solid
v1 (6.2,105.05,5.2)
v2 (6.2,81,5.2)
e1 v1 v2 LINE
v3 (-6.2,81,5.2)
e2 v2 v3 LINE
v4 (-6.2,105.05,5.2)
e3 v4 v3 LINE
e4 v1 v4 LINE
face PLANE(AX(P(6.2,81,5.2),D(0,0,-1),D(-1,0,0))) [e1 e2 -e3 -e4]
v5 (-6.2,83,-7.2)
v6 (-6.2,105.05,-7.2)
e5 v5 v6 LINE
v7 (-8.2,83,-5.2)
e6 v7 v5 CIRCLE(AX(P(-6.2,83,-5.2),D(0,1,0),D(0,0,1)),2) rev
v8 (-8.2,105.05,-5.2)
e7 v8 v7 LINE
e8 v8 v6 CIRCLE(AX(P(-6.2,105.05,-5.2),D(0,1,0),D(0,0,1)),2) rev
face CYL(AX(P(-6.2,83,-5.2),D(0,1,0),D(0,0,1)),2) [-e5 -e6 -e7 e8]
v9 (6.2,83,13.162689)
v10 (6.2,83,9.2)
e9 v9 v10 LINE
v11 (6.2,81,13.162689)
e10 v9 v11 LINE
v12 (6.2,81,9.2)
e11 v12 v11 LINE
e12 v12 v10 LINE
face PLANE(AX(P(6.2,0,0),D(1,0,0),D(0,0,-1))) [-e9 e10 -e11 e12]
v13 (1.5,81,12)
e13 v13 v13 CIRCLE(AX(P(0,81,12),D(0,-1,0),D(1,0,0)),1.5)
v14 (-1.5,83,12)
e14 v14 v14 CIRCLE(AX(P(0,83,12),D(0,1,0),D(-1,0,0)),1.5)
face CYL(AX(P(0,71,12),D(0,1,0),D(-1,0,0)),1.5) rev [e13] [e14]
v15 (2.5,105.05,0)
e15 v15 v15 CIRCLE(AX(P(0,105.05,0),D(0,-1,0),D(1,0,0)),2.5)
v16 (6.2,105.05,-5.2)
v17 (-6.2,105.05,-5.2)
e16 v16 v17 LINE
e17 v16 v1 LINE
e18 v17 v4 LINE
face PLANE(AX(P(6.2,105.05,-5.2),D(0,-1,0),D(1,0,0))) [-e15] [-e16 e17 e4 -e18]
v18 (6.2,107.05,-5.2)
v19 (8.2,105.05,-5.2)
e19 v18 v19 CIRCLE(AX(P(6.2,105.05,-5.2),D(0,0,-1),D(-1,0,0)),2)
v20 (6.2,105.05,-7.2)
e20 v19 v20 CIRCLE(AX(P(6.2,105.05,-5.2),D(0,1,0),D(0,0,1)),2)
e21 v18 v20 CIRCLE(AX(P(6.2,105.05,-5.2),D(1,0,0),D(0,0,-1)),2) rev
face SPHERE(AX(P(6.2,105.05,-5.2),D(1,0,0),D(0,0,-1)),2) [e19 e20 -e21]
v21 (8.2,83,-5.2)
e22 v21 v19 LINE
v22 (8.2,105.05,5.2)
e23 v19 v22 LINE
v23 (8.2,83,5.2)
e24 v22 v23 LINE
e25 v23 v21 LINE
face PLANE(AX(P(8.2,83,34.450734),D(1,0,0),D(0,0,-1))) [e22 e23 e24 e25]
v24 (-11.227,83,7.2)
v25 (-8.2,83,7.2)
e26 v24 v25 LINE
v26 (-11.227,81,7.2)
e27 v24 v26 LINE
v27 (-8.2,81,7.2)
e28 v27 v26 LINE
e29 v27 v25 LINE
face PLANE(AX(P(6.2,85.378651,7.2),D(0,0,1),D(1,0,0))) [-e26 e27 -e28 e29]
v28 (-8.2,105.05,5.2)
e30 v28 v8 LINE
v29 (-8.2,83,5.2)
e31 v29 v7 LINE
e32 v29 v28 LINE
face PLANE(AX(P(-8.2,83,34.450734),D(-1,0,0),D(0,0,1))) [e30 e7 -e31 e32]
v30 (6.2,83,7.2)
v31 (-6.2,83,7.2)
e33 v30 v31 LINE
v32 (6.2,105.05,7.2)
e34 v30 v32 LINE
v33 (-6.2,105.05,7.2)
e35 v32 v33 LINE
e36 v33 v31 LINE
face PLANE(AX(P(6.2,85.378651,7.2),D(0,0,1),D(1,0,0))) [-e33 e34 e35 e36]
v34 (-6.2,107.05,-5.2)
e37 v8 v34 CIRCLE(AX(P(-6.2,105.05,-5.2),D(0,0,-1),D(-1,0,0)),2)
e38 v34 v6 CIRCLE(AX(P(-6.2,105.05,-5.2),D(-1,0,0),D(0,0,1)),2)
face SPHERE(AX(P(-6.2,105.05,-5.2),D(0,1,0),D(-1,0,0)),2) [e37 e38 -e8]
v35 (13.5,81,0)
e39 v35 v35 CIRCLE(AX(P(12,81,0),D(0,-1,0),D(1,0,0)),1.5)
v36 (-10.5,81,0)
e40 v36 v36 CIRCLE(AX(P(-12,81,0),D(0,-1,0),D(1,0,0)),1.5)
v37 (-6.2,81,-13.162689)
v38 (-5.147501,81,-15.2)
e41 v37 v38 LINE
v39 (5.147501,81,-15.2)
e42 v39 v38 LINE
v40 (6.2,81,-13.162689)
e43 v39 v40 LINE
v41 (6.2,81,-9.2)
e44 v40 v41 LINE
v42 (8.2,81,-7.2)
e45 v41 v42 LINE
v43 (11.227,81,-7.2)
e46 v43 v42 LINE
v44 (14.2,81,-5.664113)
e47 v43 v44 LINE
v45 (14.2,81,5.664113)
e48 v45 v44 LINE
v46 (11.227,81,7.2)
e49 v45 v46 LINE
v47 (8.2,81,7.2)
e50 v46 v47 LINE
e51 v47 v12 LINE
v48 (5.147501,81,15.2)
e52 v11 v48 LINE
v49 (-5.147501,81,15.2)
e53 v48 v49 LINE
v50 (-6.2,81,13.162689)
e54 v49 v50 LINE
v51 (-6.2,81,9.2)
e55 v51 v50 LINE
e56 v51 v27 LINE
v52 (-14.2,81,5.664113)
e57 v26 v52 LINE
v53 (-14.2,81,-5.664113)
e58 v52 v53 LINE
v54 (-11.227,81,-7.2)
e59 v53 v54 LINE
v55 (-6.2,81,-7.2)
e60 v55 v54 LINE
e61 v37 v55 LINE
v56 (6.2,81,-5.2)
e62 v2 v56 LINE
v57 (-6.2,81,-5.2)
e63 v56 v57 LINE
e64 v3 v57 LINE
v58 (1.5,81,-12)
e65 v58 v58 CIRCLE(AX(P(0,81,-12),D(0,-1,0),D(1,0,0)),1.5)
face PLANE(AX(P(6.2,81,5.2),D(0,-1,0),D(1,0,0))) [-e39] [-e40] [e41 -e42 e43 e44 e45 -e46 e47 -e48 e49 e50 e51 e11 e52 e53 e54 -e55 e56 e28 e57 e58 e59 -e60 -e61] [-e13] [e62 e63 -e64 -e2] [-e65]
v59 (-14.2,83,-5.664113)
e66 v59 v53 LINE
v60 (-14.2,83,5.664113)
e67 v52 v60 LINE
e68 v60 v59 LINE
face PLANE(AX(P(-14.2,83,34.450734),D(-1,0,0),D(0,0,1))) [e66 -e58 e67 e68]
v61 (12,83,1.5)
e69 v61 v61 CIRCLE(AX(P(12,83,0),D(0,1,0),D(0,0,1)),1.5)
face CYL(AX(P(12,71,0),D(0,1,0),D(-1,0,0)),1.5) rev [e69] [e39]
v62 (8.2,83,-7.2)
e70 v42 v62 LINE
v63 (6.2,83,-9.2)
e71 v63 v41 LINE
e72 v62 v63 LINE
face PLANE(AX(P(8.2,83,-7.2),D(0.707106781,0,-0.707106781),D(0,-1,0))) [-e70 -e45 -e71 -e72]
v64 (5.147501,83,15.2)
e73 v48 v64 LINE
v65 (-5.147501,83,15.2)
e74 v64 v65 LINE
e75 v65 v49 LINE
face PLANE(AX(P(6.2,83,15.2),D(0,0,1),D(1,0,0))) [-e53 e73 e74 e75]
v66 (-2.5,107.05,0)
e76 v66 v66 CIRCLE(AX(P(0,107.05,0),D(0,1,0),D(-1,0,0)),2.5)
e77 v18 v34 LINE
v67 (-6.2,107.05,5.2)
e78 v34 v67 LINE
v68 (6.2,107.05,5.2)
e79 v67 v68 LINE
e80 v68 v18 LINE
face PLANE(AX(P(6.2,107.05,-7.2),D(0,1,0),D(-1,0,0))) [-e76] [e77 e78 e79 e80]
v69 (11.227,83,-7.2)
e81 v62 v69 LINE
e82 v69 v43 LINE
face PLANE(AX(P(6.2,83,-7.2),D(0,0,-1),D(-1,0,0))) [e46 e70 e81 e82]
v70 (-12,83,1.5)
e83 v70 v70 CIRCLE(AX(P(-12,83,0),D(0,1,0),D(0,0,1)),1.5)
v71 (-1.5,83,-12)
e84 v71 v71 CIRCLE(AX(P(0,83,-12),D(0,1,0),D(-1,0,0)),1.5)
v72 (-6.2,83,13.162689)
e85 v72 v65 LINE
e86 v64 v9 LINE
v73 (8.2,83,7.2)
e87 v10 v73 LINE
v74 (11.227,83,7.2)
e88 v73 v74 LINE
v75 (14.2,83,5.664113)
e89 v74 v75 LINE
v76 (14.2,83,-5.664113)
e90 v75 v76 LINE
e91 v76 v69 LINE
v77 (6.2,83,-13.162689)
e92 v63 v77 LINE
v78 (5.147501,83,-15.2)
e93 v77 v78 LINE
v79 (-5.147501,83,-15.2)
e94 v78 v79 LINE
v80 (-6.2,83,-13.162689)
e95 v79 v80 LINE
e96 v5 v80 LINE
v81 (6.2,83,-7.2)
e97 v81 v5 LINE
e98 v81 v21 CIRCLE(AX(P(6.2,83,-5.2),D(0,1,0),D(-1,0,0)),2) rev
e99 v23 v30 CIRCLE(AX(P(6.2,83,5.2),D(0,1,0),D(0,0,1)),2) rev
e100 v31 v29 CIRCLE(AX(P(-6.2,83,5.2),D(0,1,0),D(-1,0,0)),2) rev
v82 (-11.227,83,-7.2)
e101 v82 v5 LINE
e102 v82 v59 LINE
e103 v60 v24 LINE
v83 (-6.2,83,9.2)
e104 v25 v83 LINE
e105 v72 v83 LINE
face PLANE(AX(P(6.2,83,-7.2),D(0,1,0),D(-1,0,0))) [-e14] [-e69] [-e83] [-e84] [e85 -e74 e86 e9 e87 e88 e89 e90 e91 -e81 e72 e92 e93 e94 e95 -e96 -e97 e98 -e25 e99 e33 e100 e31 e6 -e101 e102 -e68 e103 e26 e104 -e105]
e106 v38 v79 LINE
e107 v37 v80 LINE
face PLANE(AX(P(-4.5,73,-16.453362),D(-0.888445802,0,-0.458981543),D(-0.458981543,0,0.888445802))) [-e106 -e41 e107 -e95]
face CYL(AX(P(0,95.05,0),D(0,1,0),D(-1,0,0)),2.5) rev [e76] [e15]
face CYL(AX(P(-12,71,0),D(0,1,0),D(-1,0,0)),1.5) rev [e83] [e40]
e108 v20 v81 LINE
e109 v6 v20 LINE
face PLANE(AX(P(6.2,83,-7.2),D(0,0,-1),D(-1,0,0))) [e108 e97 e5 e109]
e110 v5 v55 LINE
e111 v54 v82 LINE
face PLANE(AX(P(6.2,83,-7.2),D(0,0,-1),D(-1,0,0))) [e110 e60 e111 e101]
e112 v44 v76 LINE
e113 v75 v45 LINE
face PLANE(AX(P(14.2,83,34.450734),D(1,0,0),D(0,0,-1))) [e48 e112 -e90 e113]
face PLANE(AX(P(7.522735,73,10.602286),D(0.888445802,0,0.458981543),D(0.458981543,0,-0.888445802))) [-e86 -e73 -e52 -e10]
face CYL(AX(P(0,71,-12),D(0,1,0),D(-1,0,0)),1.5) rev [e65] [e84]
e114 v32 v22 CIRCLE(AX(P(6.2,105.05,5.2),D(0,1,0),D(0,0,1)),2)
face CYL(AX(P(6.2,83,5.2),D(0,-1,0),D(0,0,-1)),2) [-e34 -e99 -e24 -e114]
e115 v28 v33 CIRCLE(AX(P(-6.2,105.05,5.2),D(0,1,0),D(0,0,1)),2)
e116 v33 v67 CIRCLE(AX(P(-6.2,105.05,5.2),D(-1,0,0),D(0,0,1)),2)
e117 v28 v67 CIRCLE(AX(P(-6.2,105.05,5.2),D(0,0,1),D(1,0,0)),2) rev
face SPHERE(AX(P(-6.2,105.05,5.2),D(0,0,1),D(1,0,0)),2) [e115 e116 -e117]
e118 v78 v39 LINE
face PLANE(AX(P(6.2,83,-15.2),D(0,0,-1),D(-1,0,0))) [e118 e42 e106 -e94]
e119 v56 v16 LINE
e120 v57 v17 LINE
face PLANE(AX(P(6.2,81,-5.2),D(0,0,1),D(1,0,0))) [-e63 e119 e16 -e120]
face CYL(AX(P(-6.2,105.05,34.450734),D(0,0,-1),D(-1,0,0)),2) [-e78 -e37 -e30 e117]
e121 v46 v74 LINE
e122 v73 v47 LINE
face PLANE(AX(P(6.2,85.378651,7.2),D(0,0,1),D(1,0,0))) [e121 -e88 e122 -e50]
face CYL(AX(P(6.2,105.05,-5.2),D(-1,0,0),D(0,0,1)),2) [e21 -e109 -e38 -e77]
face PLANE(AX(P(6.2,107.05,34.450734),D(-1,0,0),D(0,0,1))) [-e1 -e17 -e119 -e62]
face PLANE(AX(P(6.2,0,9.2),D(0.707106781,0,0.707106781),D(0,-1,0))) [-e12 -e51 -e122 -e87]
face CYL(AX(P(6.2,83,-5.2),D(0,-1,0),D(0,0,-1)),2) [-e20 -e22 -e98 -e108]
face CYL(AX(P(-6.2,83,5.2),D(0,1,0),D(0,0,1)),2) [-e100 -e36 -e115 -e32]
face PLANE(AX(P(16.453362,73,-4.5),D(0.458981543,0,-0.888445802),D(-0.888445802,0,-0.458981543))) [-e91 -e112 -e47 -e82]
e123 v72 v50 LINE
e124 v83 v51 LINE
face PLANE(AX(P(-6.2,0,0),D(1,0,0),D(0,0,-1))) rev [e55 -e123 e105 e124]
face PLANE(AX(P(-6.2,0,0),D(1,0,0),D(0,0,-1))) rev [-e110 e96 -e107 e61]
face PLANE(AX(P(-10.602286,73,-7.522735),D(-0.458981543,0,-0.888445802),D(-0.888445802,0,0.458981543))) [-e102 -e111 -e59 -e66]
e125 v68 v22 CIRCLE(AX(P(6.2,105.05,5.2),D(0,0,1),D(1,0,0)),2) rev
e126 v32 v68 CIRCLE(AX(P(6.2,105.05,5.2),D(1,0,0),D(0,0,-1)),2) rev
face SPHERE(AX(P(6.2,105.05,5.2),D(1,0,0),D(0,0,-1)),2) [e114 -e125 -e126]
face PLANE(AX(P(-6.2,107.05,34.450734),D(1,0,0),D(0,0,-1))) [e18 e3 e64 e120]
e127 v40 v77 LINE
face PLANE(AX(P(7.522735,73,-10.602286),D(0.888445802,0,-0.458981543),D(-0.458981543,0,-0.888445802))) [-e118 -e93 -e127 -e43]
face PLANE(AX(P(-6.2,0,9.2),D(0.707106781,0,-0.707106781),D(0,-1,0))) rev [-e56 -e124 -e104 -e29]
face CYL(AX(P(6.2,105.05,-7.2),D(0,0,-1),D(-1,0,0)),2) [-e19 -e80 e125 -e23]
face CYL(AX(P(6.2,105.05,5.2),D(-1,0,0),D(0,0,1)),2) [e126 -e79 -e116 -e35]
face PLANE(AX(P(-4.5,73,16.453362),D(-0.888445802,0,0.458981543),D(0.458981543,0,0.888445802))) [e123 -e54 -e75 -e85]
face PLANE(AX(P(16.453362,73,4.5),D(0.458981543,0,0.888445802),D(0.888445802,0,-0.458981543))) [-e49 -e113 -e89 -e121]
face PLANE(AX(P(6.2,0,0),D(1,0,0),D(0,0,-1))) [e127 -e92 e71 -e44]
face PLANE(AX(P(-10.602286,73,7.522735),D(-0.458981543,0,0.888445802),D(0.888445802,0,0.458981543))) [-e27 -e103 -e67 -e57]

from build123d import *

# Parameters (mm, degrees)
BOSS_EXTRUDE1_START = 0.2
BOSS_EXTRUDE1_DEPTH = 12.4
SKETCH4_R           = 2.5
CUT_EXTRUDE1_DEPTH  = 12
SKETCH5_R           = 1.5
CUT_EXTRUDE2_DEPTH  = 12
BOSS_EXTRUDE3_DEPTH = 14.4
CIRPATTERN1_COUNT   = 2
CIRPATTERN1_ANGLE   = 90
CUT_EXTRUDE3_DEPTH  = 10
CHAMFER1_SIZE       = 2
FILLET1_R           = 2


with BuildPart() as part:
    # Sketch3 → Boss-Extrude1 (new body)
    with BuildSketch(Plane.ZY.offset(6.000000089).offset(BOSS_EXTRUDE1_START)):
        Polygon((5.2, 81), (5.2, 105.05), (-5.2, 105.05), (-5.2, 81), (-15.2, 81), (-15.2, 83), (-7.2, 83), (-7.2, 107.05), (7.2, 107.05), (7.2, 85.378651171), (7.2, 83), (15.2, 83), (15.2, 81), align=None)
    extrude(amount=-BOSS_EXTRUDE1_DEPTH)

    # Sketch4 → Cut-Extrude1 (cut)
    with BuildSketch(Plane(origin=(0, 107.05, 0), x_dir=(1, 0, 0), z_dir=(0, 1, 0))):
        with Locations(Location((0, 0, 0), (0, 0, 180))):
            Circle(SKETCH4_R)
    extrude(amount=-CUT_EXTRUDE1_DEPTH, mode=Mode.SUBTRACT)

    # Sketch5 → Cut-Extrude2 (cut)
    with BuildSketch(Plane(origin=(0, 83, 0), x_dir=(1, 0, 0), z_dir=(0, 1, 0))):
        with Locations(Location((-1.03e-07, 12, 0), (0, 0, 180))):
            Circle(SKETCH5_R)
        with Locations(Location((-1.03e-07, -12, 0), (0, 0, 180))):
            Circle(SKETCH5_R)
    cut_extrude2 = extrude(amount=-CUT_EXTRUDE2_DEPTH, mode=Mode.SUBTRACT)

    # Sketch7 → Boss-Extrude3 (add)
    with BuildSketch(Plane(origin=(0, 0, -7.2), x_dir=(-1, 0, 0), z_dir=(0, 0, -1))):
        Polygon((14.200000089, 83), (14.200000089, 81), (6.200000089, 81), (6.200000089, 107.05), (8.200000089, 107.05), (8.200000089, 83), align=None)
        Polygon((-8.200000089, 107.05), (-6.200000089, 107.05), (-6.200000089, 81), (-14.200000089, 81), (-14.200000089, 83), (-8.200000089, 83), align=None)
    extrude(amount=-BOSS_EXTRUDE3_DEPTH)

    # CirPattern1: Cut-Extrude2 ×2 about axis
    cirpattern1_axis = Axis((0, 0, 0), (0, 1, 0))
    for i in range(1, CIRPATTERN1_COUNT):
        add(cut_extrude2.rotate(cirpattern1_axis, i * CIRPATTERN1_ANGLE / (CIRPATTERN1_COUNT - 1)), mode=Mode.SUBTRACT)

    # Sketch11 → Cut-Extrude3 (cut)
    with BuildSketch(Plane(origin=(0, 83, 0), x_dir=(1, 0, 0), z_dir=(0, 1, 0))):
        with BuildLine():
            Line((18.453361638, 5.717898617), (11.935828042, 9.084933074))
            ThreePointArc((11.935828042, 9.084933074), (10.606601718, 10.606601718), (9.084933074, 11.935828042))
            Line((9.084933074, 11.935828042), (5.717898617, 18.453361638))
            Line((5.717898617, 18.453361638), (-5.717898617, 18.453361638))
            Line((-5.717898617, 18.453361638), (-9.084933074, 11.935828042))
            ThreePointArc((-9.084933074, 11.935828042), (-10.606601718, 10.606601718), (-11.935828042, 9.084933074))
            Line((-11.935828042, 9.084933074), (-18.453361638, 5.717898617))
            Line((-18.453361638, 5.717898617), (-18.453361638, -5.717898617))
            Line((-18.453361638, -5.717898617), (-11.935828042, -9.084933074))
            ThreePointArc((-11.935828042, -9.084933074), (-10.606601718, -10.606601718), (-9.084933074, -11.935828042))
            Line((-9.084933074, -11.935828042), (-5.717898617, -18.453361638))
            Line((-5.717898617, -18.453361638), (5.717898617, -18.453361638))
            Line((5.717898617, -18.453361638), (9.084933074, -11.935828042))
            ThreePointArc((9.084933074, -11.935828042), (10.606601718, -10.606601718), (11.935828042, -9.084933074))
            Line((11.935828042, -9.084933074), (18.453361638, -5.717898617))
            Line((18.453361638, -5.717898617), (18.453361638, 5.717898617))
        make_face()
        with BuildLine():
            Line((16.453361638, 4.5), (10.602285857, 7.522734517))
            ThreePointArc((10.602285857, 7.522734517), (9.192388155, 9.192388155), (7.522734517, 10.602285857))
            Line((7.522734517, 10.602285857), (4.5, 16.453361638))
            Line((4.5, 16.453361638), (-4.5, 16.453361638))
            Line((-4.5, 16.453361638), (-7.522734517, 10.602285857))
            ThreePointArc((-7.522734517, 10.602285857), (-9.192388155, 9.192388155), (-10.602285857, 7.522734517))
            Line((-10.602285857, 7.522734517), (-16.453361638, 4.5))
            Line((-16.453361638, 4.5), (-16.453361638, -4.5))
            Line((-16.453361638, -4.5), (-10.602285857, -7.522734517))
            ThreePointArc((-10.602285857, -7.522734517), (-9.192388155, -9.192388155), (-7.522734517, -10.602285857))
            Line((-7.522734517, -10.602285857), (-4.5, -16.453361638))
            Line((-4.5, -16.453361638), (4.5, -16.453361638))
            Line((4.5, -16.453361638), (7.522734517, -10.602285857))
            ThreePointArc((7.522734517, -10.602285857), (9.192388155, -9.192388155), (10.602285857, -7.522734517))
            Line((10.602285857, -7.522734517), (16.453361638, -4.5))
            Line((16.453361638, -4.5), (16.453361638, 4.5))
        make_face(mode=Mode.SUBTRACT)
    extrude(amount=-CUT_EXTRUDE3_DEPTH, mode=Mode.SUBTRACT)

    # Chamfer1
    chamfer1_edges = [part.edges().sort_by_distance(p)[0] for p in [
        (-6.200000089, 82, 7.2),
        (6.200000089, 82, -7.2),
        (6.200000089, 82, 7.2),
    ]]
    chamfer(chamfer1_edges, length=CHAMFER1_SIZE)

    # Fillet1
    # the kernel refuses this fillet: 2 mm, written as the material it takes off along each edge
    with BuildSketch(Plane(origin=(-6.200000089, 105.05, -5.2), x_dir=(0, 1, 0), z_dir=(0, 0, -1))) as fillet1_piece_1_section:
        Polygon((0, 0), (FILLET1_R * 1.02, 0), (FILLET1_R * 1.02, -FILLET1_R * 1.02), (0, -FILLET1_R * 1.02), align=None)
    fillet1_piece_1 = extrude(amount=FILLET1_R * 1.02, mode=Mode.PRIVATE)
    fillet1_piece_1 = fillet1_piece_1 - Plane(origin=(-6.200000089, 105.05, -5.2), x_dir=(0.7071067811865474, -0.7071067811865478, 5.985977498731896e-15), z_dir=(0, 0, -1)) * Sphere(FILLET1_R, mode=Mode.PRIVATE)
    add(fillet1_piece_1, mode=Mode.SUBTRACT)
    with BuildSketch(Plane(origin=(6.200000089, 105.05, -5.2), x_dir=(0, 0, -1), z_dir=(1, 0, 0))) as fillet1_piece_2_section:
        Polygon((0, 0), (FILLET1_R * 1.02, 0), (FILLET1_R * 1.02, FILLET1_R * 1.02), (0, FILLET1_R * 1.02), align=None)
    fillet1_piece_2 = extrude(amount=FILLET1_R * 1.02, mode=Mode.PRIVATE)
    fillet1_piece_2 = fillet1_piece_2 - Plane(origin=(6.200000089, 105.05, -5.2), x_dir=(-6.4472925120618815e-15, -0.7071067811865475, 0.7071067811865475), z_dir=(1, 0, 0)) * Sphere(FILLET1_R, mode=Mode.PRIVATE)
    add(fillet1_piece_2, mode=Mode.SUBTRACT)
    with BuildSketch(Plane(origin=(6.200000089, 105.05, 5.2), x_dir=(0, 0, 1), z_dir=(1, 0, 0))) as fillet1_piece_3_section:
        Polygon((0, 0), (FILLET1_R * 1.02, 0), (FILLET1_R * 1.02, -FILLET1_R * 1.02), (0, -FILLET1_R * 1.02), align=None)
    fillet1_piece_3 = extrude(amount=FILLET1_R * 1.02, mode=Mode.PRIVATE)
    fillet1_piece_3 = fillet1_piece_3 - Plane(origin=(6.200000089, 105.05, 5.2), x_dir=(5.5246624854019046e-15, -0.7071067811865475, -0.7071067811865475), z_dir=(1, 0, 0)) * Sphere(FILLET1_R, mode=Mode.PRIVATE)
    add(fillet1_piece_3, mode=Mode.SUBTRACT)
    with BuildSketch(Plane(origin=(-6.200000089, 105.05, 5.2), x_dir=(0, 1, 0), z_dir=(0, 0, 1))) as fillet1_piece_4_section:
        Polygon((0, 0), (FILLET1_R * 1.02, 0), (FILLET1_R * 1.02, FILLET1_R * 1.02), (0, FILLET1_R * 1.02), align=None)
    fillet1_piece_4 = extrude(amount=FILLET1_R * 1.02, mode=Mode.PRIVATE)
    fillet1_piece_4 = fillet1_piece_4 - Plane(origin=(-6.200000089, 105.05, 5.2), x_dir=(0.7071067811865474, -0.7071067811865478, 5.985977498731896e-15), z_dir=(0, 0, 1)) * Sphere(FILLET1_R, mode=Mode.PRIVATE)
    add(fillet1_piece_4, mode=Mode.SUBTRACT)
    with BuildSketch(Plane(origin=(-6.200000089, 107.05, -7.2), x_dir=(0, 0, 1), z_dir=(1, 0, 0)), Plane(origin=(6.200000089, 107.05, 7.2), x_dir=(0, 0, -1), z_dir=(-1, 0, 0))) as fillet1_piece_5:
        with BuildLine():
            CenterArc((FILLET1_R, FILLET1_R), FILLET1_R, 180, 90)
            Line((0, FILLET1_R), (0, 0))
            Line((0, 0), (FILLET1_R, 0))
        make_face()
    extrude(amount=12.400000179, mode=Mode.SUBTRACT)
    with BuildSketch(Plane(origin=(-8.200000089, 105.05, -7.2), x_dir=(0, 0, 1), z_dir=(0, -1, 0)), Plane(origin=(8.200000089, 83, -7.2), x_dir=(0, 0, 1), z_dir=(0, 1, 0))) as fillet1_piece_6:
        with BuildLine():
            CenterArc((FILLET1_R, -FILLET1_R), FILLET1_R, 90, 90)
            Line((0, -FILLET1_R), (0, 0))
            Line((0, 0), (FILLET1_R, 0))
        make_face()
    extrude(amount=22.05, mode=Mode.SUBTRACT)
    with BuildSketch(Plane(origin=(-8.200000089, 105.05, 7.2), x_dir=(0, 0, -1), z_dir=(0, -1, 0)), Plane(origin=(8.200000089, 83, 7.2), x_dir=(0, 0, -1), z_dir=(0, 1, 0))) as fillet1_piece_7:
        with BuildLine():
            CenterArc((FILLET1_R, FILLET1_R), FILLET1_R, 180, 90)
            Line((0, FILLET1_R), (0, 0))
            Line((0, 0), (FILLET1_R, 0))
        make_face()
    extrude(amount=22.05, mode=Mode.SUBTRACT)
    with BuildSketch(Plane(origin=(-8.200000089, 107.05, -5.2), x_dir=(1, 0, 0), z_dir=(0, 0, 1))) as fillet1_piece_8:
        with BuildLine():
            CenterArc((FILLET1_R, -FILLET1_R), FILLET1_R, 90, 90)
            Line((0, -FILLET1_R), (0, 0))
            Line((0, 0), (FILLET1_R, 0))
        make_face()
    extrude(amount=10.4, mode=Mode.SUBTRACT)
    with BuildSketch(Plane(origin=(8.200000089, 107.05, -5.2), x_dir=(-1, 0, 0), z_dir=(0, 0, 1))) as fillet1_piece_9:
        with BuildLine():
            CenterArc((FILLET1_R, FILLET1_R), FILLET1_R, 180, 90)
            Line((0, FILLET1_R), (0, 0))
            Line((0, 0), (FILLET1_R, 0))
        make_face()
    extrude(amount=10.4, mode=Mode.SUBTRACT)


solid = part.part
